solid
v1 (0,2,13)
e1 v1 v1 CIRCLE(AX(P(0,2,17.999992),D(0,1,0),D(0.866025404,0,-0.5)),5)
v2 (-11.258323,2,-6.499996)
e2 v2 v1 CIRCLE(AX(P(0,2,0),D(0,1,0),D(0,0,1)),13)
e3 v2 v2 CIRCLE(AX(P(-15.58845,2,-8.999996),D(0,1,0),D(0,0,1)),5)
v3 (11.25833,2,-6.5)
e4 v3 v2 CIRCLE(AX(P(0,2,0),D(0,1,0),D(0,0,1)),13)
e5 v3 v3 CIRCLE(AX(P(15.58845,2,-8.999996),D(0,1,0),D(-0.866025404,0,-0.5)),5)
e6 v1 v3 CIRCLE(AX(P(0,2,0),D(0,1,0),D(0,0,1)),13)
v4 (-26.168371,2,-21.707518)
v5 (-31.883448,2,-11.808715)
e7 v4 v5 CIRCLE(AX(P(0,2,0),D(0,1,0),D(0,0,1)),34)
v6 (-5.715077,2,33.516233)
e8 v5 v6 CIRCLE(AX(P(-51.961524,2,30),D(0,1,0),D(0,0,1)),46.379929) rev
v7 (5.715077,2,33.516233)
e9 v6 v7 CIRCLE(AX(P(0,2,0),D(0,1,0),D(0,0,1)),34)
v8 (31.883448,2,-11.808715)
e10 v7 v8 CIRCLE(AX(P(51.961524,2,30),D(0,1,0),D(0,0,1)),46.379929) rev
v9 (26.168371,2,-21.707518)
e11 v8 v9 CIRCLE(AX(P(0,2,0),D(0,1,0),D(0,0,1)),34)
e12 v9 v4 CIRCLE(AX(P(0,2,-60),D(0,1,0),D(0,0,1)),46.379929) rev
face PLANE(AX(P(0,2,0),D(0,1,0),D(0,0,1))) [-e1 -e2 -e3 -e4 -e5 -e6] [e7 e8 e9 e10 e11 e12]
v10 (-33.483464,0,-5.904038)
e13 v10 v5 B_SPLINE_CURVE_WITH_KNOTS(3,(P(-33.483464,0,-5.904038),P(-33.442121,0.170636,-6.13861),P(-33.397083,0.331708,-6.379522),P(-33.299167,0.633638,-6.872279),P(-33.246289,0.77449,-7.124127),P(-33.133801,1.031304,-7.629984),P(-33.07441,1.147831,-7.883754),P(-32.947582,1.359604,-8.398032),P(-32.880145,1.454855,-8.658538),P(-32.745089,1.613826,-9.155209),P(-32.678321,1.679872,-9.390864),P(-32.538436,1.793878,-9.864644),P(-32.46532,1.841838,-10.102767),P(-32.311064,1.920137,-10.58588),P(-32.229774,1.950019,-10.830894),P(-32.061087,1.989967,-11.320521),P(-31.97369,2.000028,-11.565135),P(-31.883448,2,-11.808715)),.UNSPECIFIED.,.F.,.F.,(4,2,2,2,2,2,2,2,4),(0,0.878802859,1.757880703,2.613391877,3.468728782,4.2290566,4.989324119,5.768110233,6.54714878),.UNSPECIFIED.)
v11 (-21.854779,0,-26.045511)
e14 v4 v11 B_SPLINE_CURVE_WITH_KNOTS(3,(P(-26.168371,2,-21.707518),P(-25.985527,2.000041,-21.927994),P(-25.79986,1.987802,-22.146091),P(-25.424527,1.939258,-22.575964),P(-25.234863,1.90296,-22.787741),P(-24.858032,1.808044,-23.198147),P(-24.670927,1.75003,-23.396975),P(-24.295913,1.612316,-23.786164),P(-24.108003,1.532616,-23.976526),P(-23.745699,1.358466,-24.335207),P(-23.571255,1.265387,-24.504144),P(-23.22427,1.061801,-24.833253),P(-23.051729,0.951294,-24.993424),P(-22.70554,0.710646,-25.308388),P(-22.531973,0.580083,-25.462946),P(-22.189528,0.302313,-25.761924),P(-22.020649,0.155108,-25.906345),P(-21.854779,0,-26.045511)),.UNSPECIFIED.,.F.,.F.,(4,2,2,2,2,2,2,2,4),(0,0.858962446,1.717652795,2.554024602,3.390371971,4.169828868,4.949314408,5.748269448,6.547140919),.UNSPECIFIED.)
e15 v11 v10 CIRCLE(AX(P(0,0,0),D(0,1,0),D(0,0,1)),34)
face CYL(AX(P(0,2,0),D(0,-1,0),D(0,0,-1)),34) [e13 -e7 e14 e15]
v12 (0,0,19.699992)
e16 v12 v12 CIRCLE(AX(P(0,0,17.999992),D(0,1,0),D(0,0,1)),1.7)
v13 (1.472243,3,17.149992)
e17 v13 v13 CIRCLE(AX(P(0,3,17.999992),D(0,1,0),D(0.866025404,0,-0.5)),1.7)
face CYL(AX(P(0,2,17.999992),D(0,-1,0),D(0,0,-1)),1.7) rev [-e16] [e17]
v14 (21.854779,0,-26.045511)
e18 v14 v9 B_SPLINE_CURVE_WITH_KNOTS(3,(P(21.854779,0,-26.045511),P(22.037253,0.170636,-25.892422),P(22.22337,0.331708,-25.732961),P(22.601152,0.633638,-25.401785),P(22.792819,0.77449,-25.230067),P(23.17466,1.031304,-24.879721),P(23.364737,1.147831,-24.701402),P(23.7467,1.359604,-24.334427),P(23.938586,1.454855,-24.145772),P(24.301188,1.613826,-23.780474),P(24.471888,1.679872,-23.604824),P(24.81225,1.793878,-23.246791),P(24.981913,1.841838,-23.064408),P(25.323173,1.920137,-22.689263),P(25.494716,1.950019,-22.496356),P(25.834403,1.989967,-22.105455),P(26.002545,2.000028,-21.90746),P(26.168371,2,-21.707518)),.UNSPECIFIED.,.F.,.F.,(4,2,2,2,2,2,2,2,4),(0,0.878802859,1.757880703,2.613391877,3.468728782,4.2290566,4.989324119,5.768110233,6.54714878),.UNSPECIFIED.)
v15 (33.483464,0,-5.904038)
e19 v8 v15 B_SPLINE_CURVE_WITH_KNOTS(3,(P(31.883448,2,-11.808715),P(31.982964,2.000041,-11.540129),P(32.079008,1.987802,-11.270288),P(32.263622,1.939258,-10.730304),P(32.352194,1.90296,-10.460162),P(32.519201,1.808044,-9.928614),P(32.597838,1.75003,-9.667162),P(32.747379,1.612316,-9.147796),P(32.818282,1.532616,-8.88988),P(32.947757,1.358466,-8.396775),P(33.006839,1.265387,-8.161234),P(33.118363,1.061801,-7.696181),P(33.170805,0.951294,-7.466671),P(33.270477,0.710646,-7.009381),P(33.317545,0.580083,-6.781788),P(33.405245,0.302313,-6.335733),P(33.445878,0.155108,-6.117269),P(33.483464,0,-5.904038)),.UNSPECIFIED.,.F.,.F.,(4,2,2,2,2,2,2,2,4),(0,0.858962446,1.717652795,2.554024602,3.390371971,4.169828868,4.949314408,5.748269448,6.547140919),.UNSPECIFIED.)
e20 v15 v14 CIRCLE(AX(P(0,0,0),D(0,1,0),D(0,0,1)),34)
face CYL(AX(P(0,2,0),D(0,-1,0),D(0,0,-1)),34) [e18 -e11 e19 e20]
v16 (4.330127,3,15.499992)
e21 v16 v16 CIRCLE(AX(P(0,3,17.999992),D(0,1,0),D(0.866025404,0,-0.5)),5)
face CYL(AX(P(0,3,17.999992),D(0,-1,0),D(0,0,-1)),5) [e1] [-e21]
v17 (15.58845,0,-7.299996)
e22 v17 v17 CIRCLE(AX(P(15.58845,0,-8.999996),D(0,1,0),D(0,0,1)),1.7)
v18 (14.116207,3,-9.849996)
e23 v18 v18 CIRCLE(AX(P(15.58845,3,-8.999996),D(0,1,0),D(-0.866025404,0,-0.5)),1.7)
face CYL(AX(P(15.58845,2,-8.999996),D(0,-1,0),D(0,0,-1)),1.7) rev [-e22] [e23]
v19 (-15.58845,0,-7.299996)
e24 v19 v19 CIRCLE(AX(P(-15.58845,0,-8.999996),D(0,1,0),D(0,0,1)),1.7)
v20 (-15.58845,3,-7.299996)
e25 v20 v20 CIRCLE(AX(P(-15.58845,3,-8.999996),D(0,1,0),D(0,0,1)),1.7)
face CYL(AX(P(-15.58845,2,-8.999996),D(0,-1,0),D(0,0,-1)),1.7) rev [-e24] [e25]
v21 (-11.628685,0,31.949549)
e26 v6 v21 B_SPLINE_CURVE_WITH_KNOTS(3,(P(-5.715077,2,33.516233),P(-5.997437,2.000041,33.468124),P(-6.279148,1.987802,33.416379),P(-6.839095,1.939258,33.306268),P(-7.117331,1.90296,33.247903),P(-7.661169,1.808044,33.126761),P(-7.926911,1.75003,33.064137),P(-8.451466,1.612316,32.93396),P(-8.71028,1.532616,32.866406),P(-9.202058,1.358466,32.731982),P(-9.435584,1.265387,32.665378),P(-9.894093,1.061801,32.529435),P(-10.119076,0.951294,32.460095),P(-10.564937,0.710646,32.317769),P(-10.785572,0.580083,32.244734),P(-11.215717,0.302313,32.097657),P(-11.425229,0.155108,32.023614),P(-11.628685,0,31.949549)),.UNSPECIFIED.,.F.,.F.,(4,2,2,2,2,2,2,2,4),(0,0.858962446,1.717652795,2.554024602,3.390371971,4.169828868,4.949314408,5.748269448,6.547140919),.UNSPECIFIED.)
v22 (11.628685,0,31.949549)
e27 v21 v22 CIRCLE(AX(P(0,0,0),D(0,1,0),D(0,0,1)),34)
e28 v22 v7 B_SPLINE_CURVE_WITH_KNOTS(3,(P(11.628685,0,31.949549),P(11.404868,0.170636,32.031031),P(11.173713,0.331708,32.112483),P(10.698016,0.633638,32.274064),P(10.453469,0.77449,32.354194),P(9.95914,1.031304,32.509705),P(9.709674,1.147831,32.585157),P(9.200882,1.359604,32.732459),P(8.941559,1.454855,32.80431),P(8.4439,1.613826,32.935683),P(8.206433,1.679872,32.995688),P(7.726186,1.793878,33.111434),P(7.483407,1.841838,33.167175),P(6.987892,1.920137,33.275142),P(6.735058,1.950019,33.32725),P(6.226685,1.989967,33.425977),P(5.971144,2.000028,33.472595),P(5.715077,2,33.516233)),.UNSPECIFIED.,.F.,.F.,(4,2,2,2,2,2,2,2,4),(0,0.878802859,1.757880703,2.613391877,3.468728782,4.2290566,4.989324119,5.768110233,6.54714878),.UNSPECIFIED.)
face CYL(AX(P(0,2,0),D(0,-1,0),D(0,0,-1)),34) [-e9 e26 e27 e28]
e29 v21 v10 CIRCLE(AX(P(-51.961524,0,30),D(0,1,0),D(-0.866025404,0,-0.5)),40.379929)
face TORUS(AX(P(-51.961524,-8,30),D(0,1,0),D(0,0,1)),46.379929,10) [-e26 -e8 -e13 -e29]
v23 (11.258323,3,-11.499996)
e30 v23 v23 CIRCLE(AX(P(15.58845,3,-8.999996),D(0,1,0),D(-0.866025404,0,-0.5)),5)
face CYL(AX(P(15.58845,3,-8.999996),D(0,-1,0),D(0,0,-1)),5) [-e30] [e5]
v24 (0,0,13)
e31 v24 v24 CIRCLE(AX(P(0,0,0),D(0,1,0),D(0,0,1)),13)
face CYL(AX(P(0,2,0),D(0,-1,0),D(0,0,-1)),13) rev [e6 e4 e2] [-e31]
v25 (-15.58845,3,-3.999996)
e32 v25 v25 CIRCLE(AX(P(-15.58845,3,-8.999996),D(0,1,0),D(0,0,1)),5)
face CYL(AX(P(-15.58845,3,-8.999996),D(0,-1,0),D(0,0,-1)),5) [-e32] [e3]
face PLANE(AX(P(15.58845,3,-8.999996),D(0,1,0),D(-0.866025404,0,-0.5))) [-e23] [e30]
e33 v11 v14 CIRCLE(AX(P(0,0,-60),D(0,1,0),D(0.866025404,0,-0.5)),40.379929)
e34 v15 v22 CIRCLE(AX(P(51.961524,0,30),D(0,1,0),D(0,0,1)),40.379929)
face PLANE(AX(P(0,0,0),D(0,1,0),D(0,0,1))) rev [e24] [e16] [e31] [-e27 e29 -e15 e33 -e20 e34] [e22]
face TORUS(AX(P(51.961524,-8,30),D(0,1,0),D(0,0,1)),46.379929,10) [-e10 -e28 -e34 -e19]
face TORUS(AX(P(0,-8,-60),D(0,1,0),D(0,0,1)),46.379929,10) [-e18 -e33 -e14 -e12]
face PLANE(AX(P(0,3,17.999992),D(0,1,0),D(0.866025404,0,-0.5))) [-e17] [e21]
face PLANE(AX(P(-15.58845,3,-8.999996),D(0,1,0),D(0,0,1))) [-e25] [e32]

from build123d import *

# Parameters (mm, degrees)
SKETCH1_R           = 34
SKETCH1_R_2         = 1.6999999999999995
SKETCH1_R_3         = 1.7
SKETCH1_R_4         = 13
BOSS_EXTRUDE1_DEPTH = 2
SKETCH3_R           = 40.37992907465996
CUT_EXTRUDE1_DEPTH  = 2
SKETCH4_R           = 5.000000000000001
SKETCH4_R_2         = 1.6999999999999995
BOSS_EXTRUDE2_DEPTH = 1
CIRPATTERN1_COUNT   = 3
FILLET1_ANGLE       = 68.695952
FILLET1_2_ANGLE     = 68.695952
FILLET1_3_ANGLE     = 68.695952


with BuildPart() as part:
    # Sketch1 → Boss-Extrude1 (new body)
    with BuildSketch(Plane(origin=(0, 0, 0), x_dir=(1, 0, 0), z_dir=(0, 1, 0))):
        with Locations(Location((0, 0, 0), (0, 0, 270))):
            Circle(SKETCH1_R)
        with Locations(Location((15.58845, 8.99999580374902, 0), (0, 0, 270))):
            Circle(SKETCH1_R_2, mode=Mode.SUBTRACT)
        with Locations(Location((1.73e-15, -17.999991607498043, 0), (0, 0, 270))):
            Circle(SKETCH1_R_3, mode=Mode.SUBTRACT)
        with Locations(Location((-15.588449999999993, 8.999995803749012, 0), (0, 0, 270))):
            Circle(SKETCH1_R_2, mode=Mode.SUBTRACT)
        with Locations(Location((0, 0, 0), (0, 0, 270))):
            Circle(SKETCH1_R_4, mode=Mode.SUBTRACT)
    extrude(amount=BOSS_EXTRUDE1_DEPTH)

    # Sketch3 → Cut-Extrude1 (cut)
    with BuildSketch(Plane(origin=(0, 2, 0), x_dir=(1, 0, 0), z_dir=(0, 1, 0))):
        with Locations((51.96152422706632, -29.999999999999986)):
            Circle(SKETCH3_R)
    cut_extrude1 = extrude(amount=-CUT_EXTRUDE1_DEPTH, mode=Mode.SUBTRACT)

    # Sketch4 → Boss-Extrude2 (add)
    with BuildSketch(Plane(origin=(0, 2, 0), x_dir=(1, 0, 0), z_dir=(0, 1, 0))):
        with Locations(Location((-15.588449999999993, 8.999995803749012, 0), (0, 0, 330))):
            Circle(SKETCH4_R)
        with Locations(Location((-15.588449999999993, 8.999995803749012, 0), (0, 0, 270))):
            Circle(SKETCH4_R_2, mode=Mode.SUBTRACT)
    boss_extrude2 = extrude(amount=BOSS_EXTRUDE2_DEPTH)

    # CirPattern1: Cut-Extrude1, Boss-Extrude2 ×3 about axis
    cirpattern1_axis = Axis((-1.58e-15, 0, 2.4e-16), (0, 1, 0))
    add([cut_extrude1.rotate(cirpattern1_axis, i * 360 / CIRPATTERN1_COUNT) for i in range(1, CIRPATTERN1_COUNT)], mode=Mode.SUBTRACT)
    add([boss_extrude2.rotate(cirpattern1_axis, i * 360 / CIRPATTERN1_COUNT) for i in range(1, CIRPATTERN1_COUNT)])

    # Fillet1: read off the stored shape, not the designer's step
    # Fillet1 outline → Fillet1 (revolve, cut)
    with BuildSketch(Plane(origin=(0, 0, -60), x_dir=(-0.5642175786181923, 0, 0.8256261405613463), z_dir=(-0.8256261405613463, 0, -0.5642175786181923))):
        with BuildLine():
            ThreePointArc((40.379929075, 0), (43.217651415, 1.486832981), (46.379929075, 2))
            Line((46.379929075, 2), (40.379929075, 2))
            Line((40.379929075, 2), (40.379929075, 0))
        make_face()
    revolve(axis=Axis((0, 0, -60), (0, 1, 0)), revolution_arc=FILLET1_ANGLE, mode=Mode.SUBTRACT)

    # Fillet1 2 outline → Fillet1 2 (revolve, cut)
    with BuildSketch(Plane(origin=(-51.961524227, 0, 30), x_dir=(0.9971220010637243, 0, 0.07581368606441925), z_dir=(-0.07581368606441925, 0, 0.9971220010637243))):
        with BuildLine():
            ThreePointArc((40.379929075, 0), (43.217651415, 1.486832981), (46.379929075, 2))
            Line((46.379929075, 2), (40.379929075, 2))
            Line((40.379929075, 2), (40.379929075, 0))
        make_face()
    revolve(axis=Axis((-51.961524227, 0, 30), (0, 1.0000000000000002, 0)), revolution_arc=FILLET1_2_ANGLE, mode=Mode.SUBTRACT)

    # Fillet1 3 outline → Fillet1 3 (revolve, cut)
    with BuildSketch(Plane(origin=(51.961524227, 0, 30), x_dir=(-0.43290442244553945, 0, -0.9014398266257676), z_dir=(0.9014398266257676, 0, -0.43290442244553945))):
        with BuildLine():
            ThreePointArc((40.379929075, 0), (43.217651415, 1.486832981), (46.379929075, 2))
            Line((46.379929075, 2), (40.379929075, 2))
            Line((40.379929075, 2), (40.379929075, 0))
        make_face()
    revolve(axis=Axis((51.961524227, 0, 30), (0, 1, 0)), revolution_arc=FILLET1_3_ANGLE, mode=Mode.SUBTRACT)


solid = part.part
